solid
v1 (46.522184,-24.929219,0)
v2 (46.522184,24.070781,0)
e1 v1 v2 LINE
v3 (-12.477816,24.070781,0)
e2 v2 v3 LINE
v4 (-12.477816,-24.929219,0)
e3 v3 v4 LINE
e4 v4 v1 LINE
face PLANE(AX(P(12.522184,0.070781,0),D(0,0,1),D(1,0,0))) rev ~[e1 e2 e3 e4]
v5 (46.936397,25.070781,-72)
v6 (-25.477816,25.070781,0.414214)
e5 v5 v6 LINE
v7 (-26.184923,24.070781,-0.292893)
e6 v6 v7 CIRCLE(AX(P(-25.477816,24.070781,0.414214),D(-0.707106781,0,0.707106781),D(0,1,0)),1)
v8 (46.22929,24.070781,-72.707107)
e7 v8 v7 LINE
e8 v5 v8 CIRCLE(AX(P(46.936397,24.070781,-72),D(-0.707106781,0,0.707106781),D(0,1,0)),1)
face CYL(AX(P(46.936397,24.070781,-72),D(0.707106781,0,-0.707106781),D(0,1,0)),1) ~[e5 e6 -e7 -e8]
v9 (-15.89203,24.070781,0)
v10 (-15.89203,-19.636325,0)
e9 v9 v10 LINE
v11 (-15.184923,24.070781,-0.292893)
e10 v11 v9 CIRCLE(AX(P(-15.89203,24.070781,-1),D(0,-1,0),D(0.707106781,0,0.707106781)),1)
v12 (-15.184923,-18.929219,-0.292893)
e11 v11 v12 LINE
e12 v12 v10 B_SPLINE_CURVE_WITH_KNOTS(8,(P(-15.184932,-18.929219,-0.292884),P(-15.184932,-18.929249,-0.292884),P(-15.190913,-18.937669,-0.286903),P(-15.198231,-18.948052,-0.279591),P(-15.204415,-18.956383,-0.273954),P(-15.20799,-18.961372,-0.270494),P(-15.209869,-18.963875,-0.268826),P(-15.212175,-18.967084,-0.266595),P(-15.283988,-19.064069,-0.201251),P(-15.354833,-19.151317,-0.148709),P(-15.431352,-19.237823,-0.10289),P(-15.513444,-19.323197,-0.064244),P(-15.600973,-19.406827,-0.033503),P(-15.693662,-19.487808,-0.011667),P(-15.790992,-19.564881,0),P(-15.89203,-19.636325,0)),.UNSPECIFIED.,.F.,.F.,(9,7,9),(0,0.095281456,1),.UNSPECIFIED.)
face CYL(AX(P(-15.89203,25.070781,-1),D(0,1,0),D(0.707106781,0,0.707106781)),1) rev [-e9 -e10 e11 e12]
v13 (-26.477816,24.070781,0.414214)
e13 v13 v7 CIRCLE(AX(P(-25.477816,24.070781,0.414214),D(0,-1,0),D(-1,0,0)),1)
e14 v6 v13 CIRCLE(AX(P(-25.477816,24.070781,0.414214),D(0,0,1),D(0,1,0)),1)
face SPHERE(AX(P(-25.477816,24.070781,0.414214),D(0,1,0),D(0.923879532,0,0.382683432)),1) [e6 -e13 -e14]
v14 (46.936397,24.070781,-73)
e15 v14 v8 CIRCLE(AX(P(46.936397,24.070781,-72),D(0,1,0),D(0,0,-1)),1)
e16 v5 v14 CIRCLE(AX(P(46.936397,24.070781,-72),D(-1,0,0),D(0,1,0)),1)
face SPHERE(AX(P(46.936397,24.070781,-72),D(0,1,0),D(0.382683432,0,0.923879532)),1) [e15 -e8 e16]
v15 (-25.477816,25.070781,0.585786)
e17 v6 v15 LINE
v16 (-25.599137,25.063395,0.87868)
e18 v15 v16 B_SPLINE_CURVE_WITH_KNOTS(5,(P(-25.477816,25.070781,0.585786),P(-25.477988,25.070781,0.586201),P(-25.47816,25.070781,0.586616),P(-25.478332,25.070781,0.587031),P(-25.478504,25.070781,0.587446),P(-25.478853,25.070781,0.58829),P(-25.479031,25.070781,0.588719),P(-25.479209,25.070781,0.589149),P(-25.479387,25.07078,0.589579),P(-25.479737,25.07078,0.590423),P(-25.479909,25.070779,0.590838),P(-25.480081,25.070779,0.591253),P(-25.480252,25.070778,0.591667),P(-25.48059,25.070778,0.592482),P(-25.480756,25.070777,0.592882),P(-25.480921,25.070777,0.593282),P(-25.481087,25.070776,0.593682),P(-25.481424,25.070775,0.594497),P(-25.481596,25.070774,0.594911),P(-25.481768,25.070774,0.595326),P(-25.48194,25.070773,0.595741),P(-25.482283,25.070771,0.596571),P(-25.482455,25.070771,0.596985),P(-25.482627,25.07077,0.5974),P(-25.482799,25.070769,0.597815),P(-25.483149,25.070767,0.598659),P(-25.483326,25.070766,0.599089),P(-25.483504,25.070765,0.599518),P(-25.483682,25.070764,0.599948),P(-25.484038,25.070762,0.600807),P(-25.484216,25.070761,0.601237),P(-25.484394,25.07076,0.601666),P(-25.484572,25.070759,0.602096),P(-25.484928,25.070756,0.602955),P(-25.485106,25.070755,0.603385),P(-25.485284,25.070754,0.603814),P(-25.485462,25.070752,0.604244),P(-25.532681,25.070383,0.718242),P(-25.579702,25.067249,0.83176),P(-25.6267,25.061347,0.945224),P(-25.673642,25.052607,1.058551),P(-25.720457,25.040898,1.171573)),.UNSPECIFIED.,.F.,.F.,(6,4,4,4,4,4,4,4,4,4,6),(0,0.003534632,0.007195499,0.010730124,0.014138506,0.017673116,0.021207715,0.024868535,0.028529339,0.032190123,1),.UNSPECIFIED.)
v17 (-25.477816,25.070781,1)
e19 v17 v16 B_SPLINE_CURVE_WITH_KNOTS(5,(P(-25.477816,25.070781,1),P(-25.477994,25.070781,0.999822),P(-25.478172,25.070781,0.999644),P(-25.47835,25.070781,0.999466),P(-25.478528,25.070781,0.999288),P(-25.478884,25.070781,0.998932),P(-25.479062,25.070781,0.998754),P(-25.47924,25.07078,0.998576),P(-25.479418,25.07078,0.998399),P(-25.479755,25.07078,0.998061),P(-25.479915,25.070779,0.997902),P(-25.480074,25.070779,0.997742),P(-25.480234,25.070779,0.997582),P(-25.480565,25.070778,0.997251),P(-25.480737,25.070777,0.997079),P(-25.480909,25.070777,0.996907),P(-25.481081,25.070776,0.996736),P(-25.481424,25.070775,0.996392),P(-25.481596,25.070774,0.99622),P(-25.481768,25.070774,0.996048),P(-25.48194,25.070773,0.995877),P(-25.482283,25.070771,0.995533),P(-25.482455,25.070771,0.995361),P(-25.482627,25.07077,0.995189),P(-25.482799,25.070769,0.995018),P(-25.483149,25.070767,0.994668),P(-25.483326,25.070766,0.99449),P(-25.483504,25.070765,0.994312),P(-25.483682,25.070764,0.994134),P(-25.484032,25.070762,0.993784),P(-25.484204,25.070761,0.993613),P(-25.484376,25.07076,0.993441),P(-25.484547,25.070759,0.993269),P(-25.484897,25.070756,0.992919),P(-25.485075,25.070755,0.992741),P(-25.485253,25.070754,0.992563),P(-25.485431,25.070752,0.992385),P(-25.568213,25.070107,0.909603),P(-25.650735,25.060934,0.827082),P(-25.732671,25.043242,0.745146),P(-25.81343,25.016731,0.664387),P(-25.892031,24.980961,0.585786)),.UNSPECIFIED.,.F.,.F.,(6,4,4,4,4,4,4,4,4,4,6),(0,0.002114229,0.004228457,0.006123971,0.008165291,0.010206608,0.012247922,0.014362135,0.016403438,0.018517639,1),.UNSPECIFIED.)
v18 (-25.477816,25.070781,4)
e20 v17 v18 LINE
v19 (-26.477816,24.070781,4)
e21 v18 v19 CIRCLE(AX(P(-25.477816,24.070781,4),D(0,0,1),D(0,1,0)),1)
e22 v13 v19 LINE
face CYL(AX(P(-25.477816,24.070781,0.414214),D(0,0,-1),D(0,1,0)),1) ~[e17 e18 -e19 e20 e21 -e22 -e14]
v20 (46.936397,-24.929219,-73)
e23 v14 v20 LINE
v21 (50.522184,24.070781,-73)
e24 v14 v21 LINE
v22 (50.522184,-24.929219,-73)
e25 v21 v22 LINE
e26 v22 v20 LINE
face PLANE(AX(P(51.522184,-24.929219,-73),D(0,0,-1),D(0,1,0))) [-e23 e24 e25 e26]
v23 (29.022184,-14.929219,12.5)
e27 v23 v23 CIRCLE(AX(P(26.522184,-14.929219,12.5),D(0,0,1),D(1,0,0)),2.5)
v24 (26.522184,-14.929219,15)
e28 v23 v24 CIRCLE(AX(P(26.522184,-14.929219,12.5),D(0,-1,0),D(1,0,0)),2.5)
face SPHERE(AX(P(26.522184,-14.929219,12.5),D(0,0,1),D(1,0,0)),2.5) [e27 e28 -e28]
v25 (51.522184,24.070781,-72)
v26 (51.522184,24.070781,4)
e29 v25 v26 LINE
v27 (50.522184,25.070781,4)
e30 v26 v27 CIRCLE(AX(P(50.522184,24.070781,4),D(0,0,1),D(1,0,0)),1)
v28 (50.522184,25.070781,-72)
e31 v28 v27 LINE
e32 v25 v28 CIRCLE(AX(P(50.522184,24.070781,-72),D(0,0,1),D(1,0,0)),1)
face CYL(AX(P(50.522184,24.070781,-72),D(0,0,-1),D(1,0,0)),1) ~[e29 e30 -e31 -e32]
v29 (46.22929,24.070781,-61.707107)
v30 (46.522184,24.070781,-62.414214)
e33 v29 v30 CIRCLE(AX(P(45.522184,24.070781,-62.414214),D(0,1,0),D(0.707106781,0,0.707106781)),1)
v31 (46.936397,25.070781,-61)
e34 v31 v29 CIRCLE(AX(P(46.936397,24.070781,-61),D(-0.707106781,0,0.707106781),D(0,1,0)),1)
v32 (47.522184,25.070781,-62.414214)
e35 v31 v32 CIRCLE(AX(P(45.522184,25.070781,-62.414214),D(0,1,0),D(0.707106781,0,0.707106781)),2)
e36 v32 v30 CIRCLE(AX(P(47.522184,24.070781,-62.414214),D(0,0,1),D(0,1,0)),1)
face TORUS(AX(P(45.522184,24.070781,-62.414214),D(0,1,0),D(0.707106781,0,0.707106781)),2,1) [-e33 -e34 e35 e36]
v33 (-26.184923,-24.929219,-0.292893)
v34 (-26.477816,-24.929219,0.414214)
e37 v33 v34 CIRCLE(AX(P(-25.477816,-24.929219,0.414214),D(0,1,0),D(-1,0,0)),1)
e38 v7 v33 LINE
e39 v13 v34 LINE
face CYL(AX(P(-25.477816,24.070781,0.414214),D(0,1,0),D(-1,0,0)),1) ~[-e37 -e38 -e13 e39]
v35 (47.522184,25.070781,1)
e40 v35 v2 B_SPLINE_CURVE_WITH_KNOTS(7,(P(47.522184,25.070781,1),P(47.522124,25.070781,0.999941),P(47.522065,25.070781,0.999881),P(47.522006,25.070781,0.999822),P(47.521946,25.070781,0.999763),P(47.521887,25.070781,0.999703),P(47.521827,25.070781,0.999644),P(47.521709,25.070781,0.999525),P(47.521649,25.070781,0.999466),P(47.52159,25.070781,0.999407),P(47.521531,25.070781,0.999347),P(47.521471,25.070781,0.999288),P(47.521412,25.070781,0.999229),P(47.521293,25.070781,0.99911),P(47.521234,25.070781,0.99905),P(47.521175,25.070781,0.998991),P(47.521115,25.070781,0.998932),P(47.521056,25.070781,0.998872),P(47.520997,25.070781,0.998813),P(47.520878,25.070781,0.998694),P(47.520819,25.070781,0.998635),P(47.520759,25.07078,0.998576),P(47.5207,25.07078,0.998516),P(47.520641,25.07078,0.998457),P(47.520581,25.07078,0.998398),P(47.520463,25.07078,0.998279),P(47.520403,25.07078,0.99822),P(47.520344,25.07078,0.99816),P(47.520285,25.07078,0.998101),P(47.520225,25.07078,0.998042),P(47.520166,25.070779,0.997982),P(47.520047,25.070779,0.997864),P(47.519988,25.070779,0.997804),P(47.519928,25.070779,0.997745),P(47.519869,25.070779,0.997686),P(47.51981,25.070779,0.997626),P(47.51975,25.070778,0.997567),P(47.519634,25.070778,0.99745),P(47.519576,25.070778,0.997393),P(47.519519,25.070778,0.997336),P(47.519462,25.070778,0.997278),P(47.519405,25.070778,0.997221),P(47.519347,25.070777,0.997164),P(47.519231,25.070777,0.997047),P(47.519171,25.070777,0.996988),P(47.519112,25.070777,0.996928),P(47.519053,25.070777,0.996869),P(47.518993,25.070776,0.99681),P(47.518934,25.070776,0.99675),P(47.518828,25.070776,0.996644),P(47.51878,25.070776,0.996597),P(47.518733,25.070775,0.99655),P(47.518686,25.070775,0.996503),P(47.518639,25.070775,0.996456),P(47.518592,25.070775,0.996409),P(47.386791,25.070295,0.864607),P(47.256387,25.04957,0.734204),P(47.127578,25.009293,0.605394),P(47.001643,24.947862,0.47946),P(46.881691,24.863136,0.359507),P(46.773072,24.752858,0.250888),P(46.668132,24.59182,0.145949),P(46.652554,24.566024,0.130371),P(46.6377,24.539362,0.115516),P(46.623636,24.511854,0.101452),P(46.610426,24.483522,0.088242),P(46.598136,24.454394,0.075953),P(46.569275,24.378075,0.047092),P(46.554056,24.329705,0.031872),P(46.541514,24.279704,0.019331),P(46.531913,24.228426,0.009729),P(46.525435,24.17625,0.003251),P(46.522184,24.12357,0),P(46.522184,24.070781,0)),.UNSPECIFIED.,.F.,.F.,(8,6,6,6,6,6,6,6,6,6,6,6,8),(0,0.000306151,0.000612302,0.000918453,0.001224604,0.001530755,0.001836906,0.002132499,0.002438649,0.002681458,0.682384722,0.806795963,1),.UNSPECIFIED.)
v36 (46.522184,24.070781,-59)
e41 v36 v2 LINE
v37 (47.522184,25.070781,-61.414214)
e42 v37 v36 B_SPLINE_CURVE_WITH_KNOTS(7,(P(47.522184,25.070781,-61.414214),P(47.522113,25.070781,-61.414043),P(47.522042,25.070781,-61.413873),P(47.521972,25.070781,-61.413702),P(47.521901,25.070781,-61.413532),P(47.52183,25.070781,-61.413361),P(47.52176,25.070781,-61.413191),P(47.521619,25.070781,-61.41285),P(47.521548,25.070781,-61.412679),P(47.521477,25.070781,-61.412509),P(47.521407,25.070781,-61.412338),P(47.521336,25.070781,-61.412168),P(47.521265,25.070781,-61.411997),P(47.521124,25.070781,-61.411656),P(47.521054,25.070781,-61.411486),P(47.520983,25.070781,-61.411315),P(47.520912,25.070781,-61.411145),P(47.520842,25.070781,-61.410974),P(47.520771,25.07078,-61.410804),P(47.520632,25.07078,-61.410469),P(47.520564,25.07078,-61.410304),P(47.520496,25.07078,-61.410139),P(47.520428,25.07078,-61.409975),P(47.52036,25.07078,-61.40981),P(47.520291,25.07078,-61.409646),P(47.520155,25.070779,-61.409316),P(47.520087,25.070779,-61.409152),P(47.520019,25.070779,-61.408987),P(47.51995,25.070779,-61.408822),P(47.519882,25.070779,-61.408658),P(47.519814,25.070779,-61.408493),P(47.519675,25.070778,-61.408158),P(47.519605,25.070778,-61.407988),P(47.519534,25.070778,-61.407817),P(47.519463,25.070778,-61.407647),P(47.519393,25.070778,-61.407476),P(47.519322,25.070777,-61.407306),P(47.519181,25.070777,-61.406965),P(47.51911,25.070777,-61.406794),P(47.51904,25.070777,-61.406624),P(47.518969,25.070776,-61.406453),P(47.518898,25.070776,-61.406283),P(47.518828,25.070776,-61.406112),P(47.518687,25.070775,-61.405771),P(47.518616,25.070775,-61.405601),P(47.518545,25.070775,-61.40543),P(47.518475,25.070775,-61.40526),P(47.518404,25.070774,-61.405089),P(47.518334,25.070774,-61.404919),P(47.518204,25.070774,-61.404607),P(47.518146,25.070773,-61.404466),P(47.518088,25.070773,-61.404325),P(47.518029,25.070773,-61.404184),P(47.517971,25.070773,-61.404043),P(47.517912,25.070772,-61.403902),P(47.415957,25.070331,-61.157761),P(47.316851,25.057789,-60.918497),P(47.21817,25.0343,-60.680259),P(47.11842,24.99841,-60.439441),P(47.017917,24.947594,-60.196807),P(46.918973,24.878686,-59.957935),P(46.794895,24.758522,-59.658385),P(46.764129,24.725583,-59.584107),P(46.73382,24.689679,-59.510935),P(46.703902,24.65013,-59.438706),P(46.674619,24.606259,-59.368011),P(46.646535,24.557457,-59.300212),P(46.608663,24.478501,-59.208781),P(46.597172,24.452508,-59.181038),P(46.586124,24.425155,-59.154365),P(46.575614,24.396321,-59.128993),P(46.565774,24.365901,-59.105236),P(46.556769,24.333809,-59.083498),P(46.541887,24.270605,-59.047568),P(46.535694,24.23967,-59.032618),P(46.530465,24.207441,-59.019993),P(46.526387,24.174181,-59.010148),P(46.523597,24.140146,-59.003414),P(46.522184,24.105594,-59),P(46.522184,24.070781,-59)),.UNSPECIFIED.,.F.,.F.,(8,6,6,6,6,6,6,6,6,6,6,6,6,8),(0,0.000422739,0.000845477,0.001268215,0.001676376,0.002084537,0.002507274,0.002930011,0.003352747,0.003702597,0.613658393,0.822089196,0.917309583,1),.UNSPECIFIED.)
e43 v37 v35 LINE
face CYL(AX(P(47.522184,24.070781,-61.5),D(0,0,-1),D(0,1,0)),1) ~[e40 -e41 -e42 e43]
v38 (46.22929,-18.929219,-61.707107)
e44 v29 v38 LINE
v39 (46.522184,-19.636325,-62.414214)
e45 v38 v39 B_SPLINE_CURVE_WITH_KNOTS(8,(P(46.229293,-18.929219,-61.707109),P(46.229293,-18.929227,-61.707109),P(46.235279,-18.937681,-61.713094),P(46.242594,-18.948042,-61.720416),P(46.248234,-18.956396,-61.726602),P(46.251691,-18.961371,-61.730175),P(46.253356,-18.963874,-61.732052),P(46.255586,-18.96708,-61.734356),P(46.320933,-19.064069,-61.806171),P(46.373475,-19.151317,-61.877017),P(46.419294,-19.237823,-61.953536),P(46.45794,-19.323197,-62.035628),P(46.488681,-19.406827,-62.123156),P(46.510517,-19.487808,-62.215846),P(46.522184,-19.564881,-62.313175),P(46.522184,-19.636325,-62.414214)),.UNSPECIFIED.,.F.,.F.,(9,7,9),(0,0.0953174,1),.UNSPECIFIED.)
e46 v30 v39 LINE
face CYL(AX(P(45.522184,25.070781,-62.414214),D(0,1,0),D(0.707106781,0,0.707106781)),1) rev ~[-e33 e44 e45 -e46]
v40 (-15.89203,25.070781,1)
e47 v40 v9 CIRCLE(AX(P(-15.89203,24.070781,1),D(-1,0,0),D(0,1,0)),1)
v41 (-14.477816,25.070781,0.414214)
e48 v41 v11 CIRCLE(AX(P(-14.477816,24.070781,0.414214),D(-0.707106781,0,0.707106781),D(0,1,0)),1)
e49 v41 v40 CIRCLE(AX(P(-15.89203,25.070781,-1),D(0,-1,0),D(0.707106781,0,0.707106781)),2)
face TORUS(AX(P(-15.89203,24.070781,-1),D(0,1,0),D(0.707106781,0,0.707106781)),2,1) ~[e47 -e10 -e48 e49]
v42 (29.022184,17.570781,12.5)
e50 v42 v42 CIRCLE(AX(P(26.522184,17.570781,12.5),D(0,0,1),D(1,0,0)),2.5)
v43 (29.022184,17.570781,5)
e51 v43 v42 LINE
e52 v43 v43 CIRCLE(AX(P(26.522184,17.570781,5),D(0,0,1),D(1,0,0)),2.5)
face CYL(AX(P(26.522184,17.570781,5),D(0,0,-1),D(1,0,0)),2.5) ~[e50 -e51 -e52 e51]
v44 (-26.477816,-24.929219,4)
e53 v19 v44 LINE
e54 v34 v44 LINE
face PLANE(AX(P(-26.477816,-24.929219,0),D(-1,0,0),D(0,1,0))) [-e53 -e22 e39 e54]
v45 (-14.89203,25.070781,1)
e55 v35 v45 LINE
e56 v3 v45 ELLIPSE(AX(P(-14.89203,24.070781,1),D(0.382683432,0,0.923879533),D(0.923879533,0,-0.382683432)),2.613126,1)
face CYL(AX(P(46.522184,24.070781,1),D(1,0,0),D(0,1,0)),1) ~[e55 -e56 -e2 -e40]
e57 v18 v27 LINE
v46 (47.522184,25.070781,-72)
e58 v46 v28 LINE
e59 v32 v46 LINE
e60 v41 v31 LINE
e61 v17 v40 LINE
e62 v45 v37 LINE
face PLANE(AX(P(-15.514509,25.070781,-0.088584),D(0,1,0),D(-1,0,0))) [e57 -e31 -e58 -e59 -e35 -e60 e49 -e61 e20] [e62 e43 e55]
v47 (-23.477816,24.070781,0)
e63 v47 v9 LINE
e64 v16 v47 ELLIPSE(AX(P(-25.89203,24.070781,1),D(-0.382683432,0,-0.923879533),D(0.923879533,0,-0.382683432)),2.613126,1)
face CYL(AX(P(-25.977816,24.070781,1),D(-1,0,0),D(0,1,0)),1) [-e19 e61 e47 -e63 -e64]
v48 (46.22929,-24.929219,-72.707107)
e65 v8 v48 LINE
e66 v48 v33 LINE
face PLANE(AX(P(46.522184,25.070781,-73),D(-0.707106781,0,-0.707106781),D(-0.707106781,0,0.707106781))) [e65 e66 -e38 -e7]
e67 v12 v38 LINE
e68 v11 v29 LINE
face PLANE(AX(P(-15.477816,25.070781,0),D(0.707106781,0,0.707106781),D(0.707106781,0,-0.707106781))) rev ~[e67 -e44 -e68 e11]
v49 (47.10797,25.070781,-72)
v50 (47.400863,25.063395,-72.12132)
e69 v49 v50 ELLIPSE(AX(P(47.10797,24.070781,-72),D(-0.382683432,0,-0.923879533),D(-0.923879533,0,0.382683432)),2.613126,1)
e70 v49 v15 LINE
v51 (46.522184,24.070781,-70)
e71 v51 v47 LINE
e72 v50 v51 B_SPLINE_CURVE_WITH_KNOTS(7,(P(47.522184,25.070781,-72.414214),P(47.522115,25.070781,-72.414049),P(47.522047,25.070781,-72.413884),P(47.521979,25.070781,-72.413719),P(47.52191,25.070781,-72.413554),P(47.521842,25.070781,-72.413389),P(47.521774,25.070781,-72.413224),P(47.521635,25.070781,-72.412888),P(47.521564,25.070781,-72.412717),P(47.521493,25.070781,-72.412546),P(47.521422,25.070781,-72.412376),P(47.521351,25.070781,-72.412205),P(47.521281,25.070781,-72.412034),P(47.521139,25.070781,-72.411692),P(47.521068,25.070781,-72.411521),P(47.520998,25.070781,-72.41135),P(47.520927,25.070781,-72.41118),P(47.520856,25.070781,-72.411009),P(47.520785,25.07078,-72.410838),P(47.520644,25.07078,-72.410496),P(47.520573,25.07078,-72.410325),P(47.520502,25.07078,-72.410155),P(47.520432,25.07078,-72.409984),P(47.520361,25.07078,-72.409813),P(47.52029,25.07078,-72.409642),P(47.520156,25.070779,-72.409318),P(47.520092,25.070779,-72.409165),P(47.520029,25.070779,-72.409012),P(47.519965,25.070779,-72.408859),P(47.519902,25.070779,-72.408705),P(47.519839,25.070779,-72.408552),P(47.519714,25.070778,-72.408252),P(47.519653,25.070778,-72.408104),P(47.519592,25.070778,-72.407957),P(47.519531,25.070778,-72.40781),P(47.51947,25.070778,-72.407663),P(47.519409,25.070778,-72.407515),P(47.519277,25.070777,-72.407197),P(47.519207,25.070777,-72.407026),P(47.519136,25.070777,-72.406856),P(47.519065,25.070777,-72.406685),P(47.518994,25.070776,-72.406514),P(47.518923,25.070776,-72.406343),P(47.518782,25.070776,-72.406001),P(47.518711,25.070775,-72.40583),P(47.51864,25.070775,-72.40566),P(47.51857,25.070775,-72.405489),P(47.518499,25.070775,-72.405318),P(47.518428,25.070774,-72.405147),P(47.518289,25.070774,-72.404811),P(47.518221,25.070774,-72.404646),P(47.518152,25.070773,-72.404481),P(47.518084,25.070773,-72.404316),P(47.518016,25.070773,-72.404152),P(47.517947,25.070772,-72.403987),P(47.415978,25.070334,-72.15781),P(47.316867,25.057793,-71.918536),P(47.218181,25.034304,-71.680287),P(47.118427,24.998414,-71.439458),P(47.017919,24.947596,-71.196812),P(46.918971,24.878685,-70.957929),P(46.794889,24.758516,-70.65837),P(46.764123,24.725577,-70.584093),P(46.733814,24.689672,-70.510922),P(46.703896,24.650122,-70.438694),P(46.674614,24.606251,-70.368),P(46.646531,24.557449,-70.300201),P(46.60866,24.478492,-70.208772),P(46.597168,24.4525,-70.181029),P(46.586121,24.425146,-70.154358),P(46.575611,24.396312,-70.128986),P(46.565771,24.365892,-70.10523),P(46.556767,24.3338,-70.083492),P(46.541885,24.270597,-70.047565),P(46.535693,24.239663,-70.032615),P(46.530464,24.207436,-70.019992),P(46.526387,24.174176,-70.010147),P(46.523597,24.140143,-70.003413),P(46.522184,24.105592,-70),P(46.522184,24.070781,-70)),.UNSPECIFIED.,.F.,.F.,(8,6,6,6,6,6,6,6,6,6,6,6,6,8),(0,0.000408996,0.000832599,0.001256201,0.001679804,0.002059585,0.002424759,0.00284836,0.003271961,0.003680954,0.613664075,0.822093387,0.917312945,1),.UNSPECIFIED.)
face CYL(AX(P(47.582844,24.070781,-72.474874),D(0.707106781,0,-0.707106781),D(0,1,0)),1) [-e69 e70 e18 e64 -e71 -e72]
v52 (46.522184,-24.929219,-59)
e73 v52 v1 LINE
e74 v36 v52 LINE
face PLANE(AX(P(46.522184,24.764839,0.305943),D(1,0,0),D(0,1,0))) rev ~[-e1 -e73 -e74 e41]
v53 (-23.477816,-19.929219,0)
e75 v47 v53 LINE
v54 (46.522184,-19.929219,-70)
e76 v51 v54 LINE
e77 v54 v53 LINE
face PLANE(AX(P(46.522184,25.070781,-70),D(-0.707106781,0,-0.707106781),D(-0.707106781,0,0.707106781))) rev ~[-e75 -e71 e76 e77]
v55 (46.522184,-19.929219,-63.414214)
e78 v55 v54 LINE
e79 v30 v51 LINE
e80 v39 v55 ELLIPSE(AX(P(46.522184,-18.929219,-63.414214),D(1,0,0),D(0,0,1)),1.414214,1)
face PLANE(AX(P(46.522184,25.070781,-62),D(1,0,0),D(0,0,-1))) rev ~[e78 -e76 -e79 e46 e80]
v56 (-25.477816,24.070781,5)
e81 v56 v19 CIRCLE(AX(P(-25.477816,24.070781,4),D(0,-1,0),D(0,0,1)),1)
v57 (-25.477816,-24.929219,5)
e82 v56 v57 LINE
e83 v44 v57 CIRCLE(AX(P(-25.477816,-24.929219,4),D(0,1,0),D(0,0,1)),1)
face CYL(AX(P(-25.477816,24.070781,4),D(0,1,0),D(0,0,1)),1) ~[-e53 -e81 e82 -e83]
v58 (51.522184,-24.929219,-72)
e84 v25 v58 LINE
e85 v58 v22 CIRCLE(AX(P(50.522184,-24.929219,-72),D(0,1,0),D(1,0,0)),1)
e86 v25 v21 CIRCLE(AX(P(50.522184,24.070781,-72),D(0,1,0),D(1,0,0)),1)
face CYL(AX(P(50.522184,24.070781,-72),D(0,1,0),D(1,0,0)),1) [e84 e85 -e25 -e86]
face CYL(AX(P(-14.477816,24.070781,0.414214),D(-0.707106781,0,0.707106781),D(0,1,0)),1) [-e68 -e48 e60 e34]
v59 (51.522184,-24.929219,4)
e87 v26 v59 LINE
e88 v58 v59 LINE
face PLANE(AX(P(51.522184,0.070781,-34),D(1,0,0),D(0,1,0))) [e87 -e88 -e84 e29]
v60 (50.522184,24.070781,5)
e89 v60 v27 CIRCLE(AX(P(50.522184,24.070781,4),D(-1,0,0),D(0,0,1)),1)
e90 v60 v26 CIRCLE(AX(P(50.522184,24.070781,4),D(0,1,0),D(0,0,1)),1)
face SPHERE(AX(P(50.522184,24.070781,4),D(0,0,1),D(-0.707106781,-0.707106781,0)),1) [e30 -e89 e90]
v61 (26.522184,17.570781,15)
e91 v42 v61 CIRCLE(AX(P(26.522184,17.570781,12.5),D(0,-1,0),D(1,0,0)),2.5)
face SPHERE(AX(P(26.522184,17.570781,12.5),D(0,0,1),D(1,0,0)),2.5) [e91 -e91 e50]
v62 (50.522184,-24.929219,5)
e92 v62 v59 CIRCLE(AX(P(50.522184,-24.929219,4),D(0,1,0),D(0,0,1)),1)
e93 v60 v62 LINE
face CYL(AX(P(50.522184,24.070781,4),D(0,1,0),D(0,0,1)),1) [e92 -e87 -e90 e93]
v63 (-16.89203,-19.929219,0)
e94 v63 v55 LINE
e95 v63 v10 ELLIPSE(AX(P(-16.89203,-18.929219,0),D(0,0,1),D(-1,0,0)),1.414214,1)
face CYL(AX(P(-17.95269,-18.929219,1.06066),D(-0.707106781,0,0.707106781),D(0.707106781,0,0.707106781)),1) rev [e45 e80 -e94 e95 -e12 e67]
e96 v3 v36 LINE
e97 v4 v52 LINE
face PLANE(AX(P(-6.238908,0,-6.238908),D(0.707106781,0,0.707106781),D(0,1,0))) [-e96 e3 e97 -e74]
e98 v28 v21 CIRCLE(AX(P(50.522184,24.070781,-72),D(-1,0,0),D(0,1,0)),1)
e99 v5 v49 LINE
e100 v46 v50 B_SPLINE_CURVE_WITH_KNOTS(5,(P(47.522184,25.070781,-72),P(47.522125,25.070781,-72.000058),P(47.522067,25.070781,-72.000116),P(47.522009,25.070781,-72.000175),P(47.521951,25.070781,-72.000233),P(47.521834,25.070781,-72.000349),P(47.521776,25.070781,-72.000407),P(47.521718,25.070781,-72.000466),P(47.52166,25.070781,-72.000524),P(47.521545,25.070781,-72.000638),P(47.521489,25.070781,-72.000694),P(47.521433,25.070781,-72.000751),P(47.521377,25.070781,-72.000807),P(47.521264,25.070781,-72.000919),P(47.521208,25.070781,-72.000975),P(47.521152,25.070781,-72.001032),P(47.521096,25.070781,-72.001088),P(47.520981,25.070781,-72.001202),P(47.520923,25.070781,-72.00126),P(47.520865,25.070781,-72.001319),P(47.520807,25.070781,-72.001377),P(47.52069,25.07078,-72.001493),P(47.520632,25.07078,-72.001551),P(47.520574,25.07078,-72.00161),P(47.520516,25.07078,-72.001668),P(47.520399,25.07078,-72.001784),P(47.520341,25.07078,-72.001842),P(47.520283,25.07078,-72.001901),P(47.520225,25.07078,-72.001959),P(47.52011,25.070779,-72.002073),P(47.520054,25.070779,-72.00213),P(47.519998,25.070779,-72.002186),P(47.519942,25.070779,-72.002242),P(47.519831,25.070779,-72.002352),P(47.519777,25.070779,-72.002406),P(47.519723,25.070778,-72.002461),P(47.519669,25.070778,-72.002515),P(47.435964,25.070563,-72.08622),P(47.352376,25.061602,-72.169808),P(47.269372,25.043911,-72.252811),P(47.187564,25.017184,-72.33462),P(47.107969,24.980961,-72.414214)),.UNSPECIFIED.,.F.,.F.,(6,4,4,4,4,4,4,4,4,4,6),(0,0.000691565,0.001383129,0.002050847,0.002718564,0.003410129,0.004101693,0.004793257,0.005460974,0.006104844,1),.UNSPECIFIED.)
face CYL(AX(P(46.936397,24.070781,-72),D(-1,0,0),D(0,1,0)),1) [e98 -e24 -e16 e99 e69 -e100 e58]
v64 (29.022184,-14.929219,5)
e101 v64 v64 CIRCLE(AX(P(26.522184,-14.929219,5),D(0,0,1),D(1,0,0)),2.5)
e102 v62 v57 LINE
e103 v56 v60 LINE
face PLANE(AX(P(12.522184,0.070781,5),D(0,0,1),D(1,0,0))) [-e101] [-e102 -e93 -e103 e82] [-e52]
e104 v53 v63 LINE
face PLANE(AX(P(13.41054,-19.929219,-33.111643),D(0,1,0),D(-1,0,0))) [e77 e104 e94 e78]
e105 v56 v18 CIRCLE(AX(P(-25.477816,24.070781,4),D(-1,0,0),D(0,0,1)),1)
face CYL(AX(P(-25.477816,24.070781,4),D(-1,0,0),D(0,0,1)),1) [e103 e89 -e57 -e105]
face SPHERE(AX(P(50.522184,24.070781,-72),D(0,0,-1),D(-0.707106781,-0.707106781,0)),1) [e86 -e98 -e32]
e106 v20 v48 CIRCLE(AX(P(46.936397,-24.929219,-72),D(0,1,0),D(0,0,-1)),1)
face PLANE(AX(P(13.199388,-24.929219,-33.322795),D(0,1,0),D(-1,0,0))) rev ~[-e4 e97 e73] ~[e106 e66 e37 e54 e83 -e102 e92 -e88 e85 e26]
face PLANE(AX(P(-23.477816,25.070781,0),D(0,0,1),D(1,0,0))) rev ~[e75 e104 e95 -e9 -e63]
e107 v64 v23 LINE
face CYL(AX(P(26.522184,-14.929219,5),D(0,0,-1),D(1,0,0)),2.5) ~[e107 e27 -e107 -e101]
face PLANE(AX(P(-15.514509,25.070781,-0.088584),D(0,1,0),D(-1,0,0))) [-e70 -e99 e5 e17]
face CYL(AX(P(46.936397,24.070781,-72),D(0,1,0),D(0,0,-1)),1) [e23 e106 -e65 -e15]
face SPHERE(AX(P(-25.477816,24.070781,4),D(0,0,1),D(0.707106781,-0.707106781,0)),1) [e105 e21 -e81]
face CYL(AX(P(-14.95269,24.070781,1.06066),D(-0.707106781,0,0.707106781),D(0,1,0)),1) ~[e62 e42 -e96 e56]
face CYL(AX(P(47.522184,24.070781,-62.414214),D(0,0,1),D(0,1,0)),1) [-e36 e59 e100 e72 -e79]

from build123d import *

# Parameters (mm, degrees)
F0_W           = 78
F0_H           = 50
F1_DEPTH       = 5
F2_R           = 2.5
F3_DEPTH       = 10
F4_R           = 2.5
F5_W           = 50
F5_H           = 78
F6_DEPTH       = 5
F8_DEPTH       = 50
F10_DEPTH      = 45
F11_T1_DEPTH   = 46.0355339059
F11_T3_DEPTH   = 92.6812408671
F11_T5_DEPTH   = 86.8528137424
F11_T7_DEPTH   = 76
F11_T9_DEPTH   = 76
F11_T11_DEPTH  = 3.5857864376
F11_T13_DEPTH  = 102.4091629285
F11_T15_DEPTH  = 3.5857864376
F11_T17_DEPTH  = 51.5
F11_T19_DEPTH  = 50.0355339059
F11_S23_W      = 1.02
F11_S23_H      = 1.02
F11_T24_DEPTH  = 1.02
F11_S29_W      = 1.02
F11_S29_H      = 1.02
F11_T30_DEPTH  = 1.02
F11_S35_W      = 1.02
F11_S35_H      = 1.02
F11_T36_DEPTH  = 1.02
F11_T42_DEPTH  = 1.02
F11_T48_DEPTH  = 1.02
F11_T54_DEPTH  = 61.5
F11_T59_DEPTH  = 61.5
F11_T64_DEPTH  = 88.43860018
F11_T70_DEPTH  = 103.9949493661
F11_T76_DEPTH  = 10.0857864376
F11_T81_DEPTH  = 10.0857864376
F11_T84_ANGLE  = 45
F11_T86_ANGLE  = 45
F11_T91_DEPTH  = 64
F11_T95_DEPTH  = 64
F11_T102_DEPTH = 61.5
F11_T106_DEPTH = 88.43860018
F11_T113_DEPTH = 61.5
F11_T117_DEPTH = 88.43860018
F11_T124_DEPTH = 10.0857864376
F11_T128_DEPTH = 103.9949493661
F11_T135_DEPTH = 103.9949493661
F11_T139_DEPTH = 10.0857864376


# Not quite as in the source:
# - a fillet or chamfer that OpenCascade refuses, or shapes differently, is made with other operations: its cross-section is extruded or revolved along the edge and cut away or added


with BuildPart() as f1:
    # F0 (on Top) → F1 (new body)
    with BuildSketch(Plane.XY):
        with Locations((12.5221835672, 0.070781447)):
            Rectangle(F0_W, F0_H)
    extrude(amount=F1_DEPTH)

    # F2 (on face) → F3 (join)
    with BuildSketch(Plane.XY.offset(5)):
        with Locations((26.5221835672, 17.570781447)):
            Circle(F2_R)
        with Locations((26.5221835672, -14.929218553)):
            Circle(F2_R)
    extrude(amount=F3_DEPTH)

    # F4
    f4_edges = [f1.edges().sort_by_distance(p)[0] for p in [
        (24.022184, 17.570781, 15),
        (24.022184, -14.929219, 15),
    ]]
    fillet(f4_edges, radius=F4_R)

    # F5 (on face) → F6 (join)
    with BuildSketch(Plane.YZ.offset(51.5221835672)):
        with Locations((0.070781447, -34)):
            Rectangle(F5_W, F5_H)
    extrude(amount=-F6_DEPTH)

    # F7 (on face) → F8 (join)
    with BuildSketch(Plane(origin=(0, 25.070781447, 0), x_dir=(-1, 0, 0), z_dir=(0, 1, 0))):
        Polygon((-46.5221835672, -73), (26.4778164328, 0), (12.4778164328, 0), (-46.5221835672, -59), align=None)
    extrude(amount=-F8_DEPTH)

    # F9 (on face) → F10 (cut)
    with BuildSketch(Plane(origin=(0, 25.070781447, 0), x_dir=(-1, 0, 0), z_dir=(0, 1, 0))):
        Polygon((15.4778164328, 0), (-46.5221835672, -62), (-46.5221835672, -70), (23.4778164328, 0), align=None)
    extrude(amount=-F10_DEPTH, mode=Mode.SUBTRACT)

    # F11: fillet of radius 1 on 20 edges, made by hand

    # F11_s2 → F11_t1 (join)
    with BuildSketch(Plane.XZ.offset(-25.070781447)):
        with BuildLine():
            ThreePointArc((-15.1849232139, -0.2928932188), (-15.5093465628, -0.0761204675), (-15.8920299951, 0))
            Line((-15.8920299951, 0), (-15.4778164328, 0))
            Line((-15.4778164328, 0), (-15.1849232139, -0.2928932188))
        make_face()
        with BuildLine():
            ThreePointArc((46.2292903484, -61.7071067812), (46.4460630998, -62.03153013), (46.5221835672, -62.4142135624))
            Line((46.5221835672, -62.4142135624), (46.5221835672, -62))
            Line((46.5221835672, -62), (46.2292903484, -61.7071067812))
        make_face()
    extrude(amount=F11_T1_DEPTH)

    # F11_s4 → F11_t3 (join)
    with BuildSketch(Plane(origin=(-9.5066751693, 0, 9.5066751693), x_dir=(0, 1, 0), z_dir=(0.7071067812, 0, -0.7071067812))):
        with BuildLine():
            ThreePointArc((-18.929218553, -10.9444689576), (-19.6363253342, -11.2373621764), (-19.929218553, -11.9444689576))
            Line((-19.929218553, -11.9444689576), (-19.929218553, -10.9444689576))
            Line((-19.929218553, -10.9444689576), (-18.929218553, -10.9444689576))
        make_face()
    extrude(amount=F11_T3_DEPTH)

    # F11_s6 → F11_t5 (cut)
    with BuildSketch(Plane(origin=(-7.4460149976, 0, 7.4460149976), x_dir=(0, 1, 0), z_dir=(0.7071067812, 0, -0.7071067812))):
        with BuildLine():
            ThreePointArc((25.070781447, -9.9444689576), (24.7778882282, -10.6515757388), (24.070781447, -10.9444689576))
            Line((24.070781447, -10.9444689576), (25.070781447, -10.9444689576))
            Line((25.070781447, -10.9444689576), (25.070781447, -9.9444689576))
        make_face()
    extrude(amount=F11_T5_DEPTH, mode=Mode.SUBTRACT)

    # F11_s8 → F11_t7 (cut)
    with BuildSketch(Plane.YZ.offset(-25.4778164328)):
        with BuildLine():
            ThreePointArc((24.070781447, 5), (24.7778882282, 4.7071067812), (25.070781447, 4))
            Line((25.070781447, 4), (25.070781447, 5))
            Line((25.070781447, 5), (24.070781447, 5))
        make_face()
    extrude(amount=F11_T7_DEPTH, mode=Mode.SUBTRACT)

    # F11_s10 → F11_t9 (cut)
    with BuildSketch(Plane.XY.offset(-72)):
        with BuildLine():
            ThreePointArc((51.5221835672, 24.070781447), (51.2292903484, 24.7778882282), (50.5221835672, 25.070781447))
            Line((50.5221835672, 25.070781447), (51.5221835672, 25.070781447))
            Line((51.5221835672, 25.070781447), (51.5221835672, 24.070781447))
        make_face()
    extrude(amount=F11_T9_DEPTH, mode=Mode.SUBTRACT)

    # F11_s12 → F11_t11 (cut)
    with BuildSketch(Plane.YZ.offset(46.9363971296)):
        with BuildLine():
            ThreePointArc((25.070781447, -72), (24.7778882282, -72.7071067812), (24.070781447, -73))
            Line((24.070781447, -73), (25.070781447, -73))
            Line((25.070781447, -73), (25.070781447, -72))
        make_face()
    extrude(amount=F11_T11_DEPTH, mode=Mode.SUBTRACT)

    # F11_s14 → F11_t13 (cut)
    with BuildSketch(Plane(origin=(59.4681985648, 0, -59.4681985648), x_dir=(0, 1, 0), z_dir=(-0.7071067812, 0, 0.7071067812))):
        with BuildLine():
            ThreePointArc((25.070781447, 17.7226435506), (24.7778882282, 18.4297503318), (24.070781447, 18.7226435506))
            Line((24.070781447, 18.7226435506), (25.070781447, 18.7226435506))
            Line((25.070781447, 18.7226435506), (25.070781447, 17.7226435506))
        make_face()
    extrude(amount=F11_T13_DEPTH, mode=Mode.SUBTRACT)

    # F11_s16 → F11_t15 (cut)
    with BuildSketch(Plane.XY.offset(0.4142135624)):
        with BuildLine():
            ThreePointArc((-25.4778164328, 25.070781447), (-26.1849232139, 24.7778882282), (-26.4778164328, 24.070781447))
            Line((-26.4778164328, 24.070781447), (-26.4778164328, 25.070781447))
            Line((-26.4778164328, 25.070781447), (-25.4778164328, 25.070781447))
        make_face()
    extrude(amount=F11_T15_DEPTH, mode=Mode.SUBTRACT)

    # F11_s18 → F11_t17 (cut)
    with BuildSketch(Plane.XZ.offset(-24.070781447)):
        with BuildLine():
            ThreePointArc((51.5221835672, -72), (51.2292903484, -72.7071067812), (50.5221835672, -73))
            Line((50.5221835672, -73), (51.5221835672, -73))
            Line((51.5221835672, -73), (51.5221835672, -72))
        make_face()
        with BuildLine():
            ThreePointArc((50.5221835672, 5), (51.2292903484, 4.7071067812), (51.5221835672, 4))
            Line((51.5221835672, 4), (51.5221835672, 5))
            Line((51.5221835672, 5), (50.5221835672, 5))
        make_face()
        with BuildLine():
            ThreePointArc((-25.4778164328, 5), (-26.1849232139, 4.7071067812), (-26.4778164328, 4))
            Line((-26.4778164328, 4), (-26.4778164328, 5))
            Line((-26.4778164328, 5), (-25.4778164328, 5))
        make_face()
    extrude(amount=F11_T17_DEPTH, mode=Mode.SUBTRACT)

    # F11_s20 → F11_t19 (cut)
    with BuildSketch(Plane.XZ.offset(-24.070781447)):
        with BuildLine():
            ThreePointArc((46.9363971296, -73), (46.5537136972, -72.9238795325), (46.2292903484, -72.7071067812))
            Line((46.2292903484, -72.7071067812), (46.5221835672, -73))
            Line((46.5221835672, -73), (46.9363971296, -73))
        make_face()
        with BuildLine():
            ThreePointArc((-26.4778164328, 0.4142135624), (-26.4016959653, 0.03153013), (-26.1849232139, -0.2928932188))
            Line((-26.1849232139, -0.2928932188), (-26.4778164328, 0))
            Line((-26.4778164328, 0), (-26.4778164328, 0.4142135624))
        make_face()
    extrude(amount=F11_T19_DEPTH, mode=Mode.SUBTRACT)


with BuildPart() as f11_tool22:
    # F11_s23 → F11_t24 (new body)
    with BuildSketch(Plane.XY.offset(4)):
        with Locations((51.0321835672, 24.580781447)):
            Rectangle(F11_S23_W, F11_S23_H)
    extrude(amount=F11_T24_DEPTH)

    # F11_s25 → F11_t26 (revolve, cut)
    with BuildSketch(Plane(origin=(50.5221835672, 24.070781447, 4), x_dir=(-0.7071067812, -0.7071067812, 0), z_dir=(-0.7071067812, 0.7071067812, 0))):
        with BuildLine():
            ThreePointArc((0, -1), (1, 0), (0, 1))
            Line((0, 1), (0, -1))
        make_face()
    revolve(axis=Axis((50.5221835672, 24.070781447, 4), (0, 0, 1)), mode=Mode.SUBTRACT)


with BuildPart() as f1_1:
    add(f1.part)

    # F11_t21: cut F11_tool22
    add(f11_tool22.part, mode=Mode.SUBTRACT)


with BuildPart() as f11_tool28:
    # F11_s29 → F11_t30 (new body)
    with BuildSketch(Plane.XY.offset(4)):
        with Locations((-25.9878164328, 24.580781447)):
            Rectangle(F11_S29_W, F11_S29_H)
    extrude(amount=F11_T30_DEPTH)

    # F11_s31 → F11_t32 (revolve, cut)
    with BuildSketch(Plane(origin=(-25.4778164328, 24.070781447, 4), x_dir=(0.7071067812, -0.7071067812, 0), z_dir=(-0.7071067812, -0.7071067812, 0))):
        with BuildLine():
            ThreePointArc((0, -1), (1, 0), (0, 1))
            Line((0, 1), (0, -1))
        make_face()
    revolve(axis=Axis((-25.4778164328, 24.070781447, 4), (0, 0, 1)), mode=Mode.SUBTRACT)


with BuildPart() as f1_2:
    add(f1_1.part)

    # F11_t27: cut F11_tool28
    add(f11_tool28.part, mode=Mode.SUBTRACT)


with BuildPart() as f11_tool34:
    # F11_s35 → F11_t36 (new body)
    with BuildSketch(Plane.XY.offset(-72)):
        with Locations((51.0321835672, 24.580781447)):
            Rectangle(F11_S35_W, F11_S35_H)
    extrude(amount=-F11_T36_DEPTH)

    # F11_s37 → F11_t38 (revolve, cut)
    with BuildSketch(Plane(origin=(50.5221835672, 24.070781447, -72), x_dir=(-0.7071067812, -0.7071067812, 0), z_dir=(0.7071067812, -0.7071067812, 0))):
        with BuildLine():
            ThreePointArc((0, -1), (1, 0), (0, 1))
            Line((0, 1), (0, -1))
        make_face()
    revolve(axis=Axis((50.5221835672, 24.070781447, -72), (0, 0, -1)), mode=Mode.SUBTRACT)


with BuildPart() as f1_3:
    add(f1_2.part)

    # F11_t33: cut F11_tool34
    add(f11_tool34.part, mode=Mode.SUBTRACT)


with BuildPart() as f11_tool40:
    # F11_s41 → F11_t42 (new body)
    with BuildSketch(Plane.XZ.offset(-24.070781447)):
        Polygon((46.9363971296, -72), (46.9363971296, -73.02), (46.513899296, -73.02), (46.2151482128, -72.7212489168), align=None)
    extrude(amount=-F11_T42_DEPTH)

    # F11_s43 → F11_t44 (revolve, cut)
    with BuildSketch(Plane(origin=(46.9363971296, 24.070781447, -72), x_dir=(0.3826834324, 0, 0.9238795325), z_dir=(-0.9238795325, 0, 0.3826834324))):
        with BuildLine():
            ThreePointArc((0, -1), (1, 0), (0, 1))
            Line((0, 1), (0, -1))
        make_face()
    revolve(axis=Axis((46.9363971296, 24.070781447, -72), (0, 1, 0)), mode=Mode.SUBTRACT)


with BuildPart() as f1_4:
    add(f1_3.part)

    # F11_t39: cut F11_tool40
    add(f11_tool40.part, mode=Mode.SUBTRACT)


with BuildPart() as f11_tool46:
    # F11_s47 → F11_t48 (new body)
    with BuildSketch(Plane.XZ.offset(-24.070781447)):
        Polygon((-25.4778164328, 0.4142135624), (-26.4978164328, 0.4142135624), (-26.4978164328, -0.0082842712), (-26.1990653496, -0.3070353544), align=None)
    extrude(amount=-F11_T48_DEPTH)

    # F11_s49 → F11_t50 (revolve, cut)
    with BuildSketch(Plane(origin=(-25.4778164328, 24.070781447, 0.4142135624), x_dir=(0.9238795325, 0, 0.3826834324), z_dir=(-0.3826834324, 0, 0.9238795325))):
        with BuildLine():
            ThreePointArc((0, -1), (1, 0), (0, 1))
            Line((0, 1), (0, -1))
        make_face()
    revolve(axis=Axis((-25.4778164328, 24.070781447, 0.4142135624), (0, 1, 0)), mode=Mode.SUBTRACT)


with BuildPart() as f1_5:
    add(f1_4.part)

    # F11_t45: cut F11_tool46
    add(f11_tool46.part, mode=Mode.SUBTRACT)


with BuildPart() as f11_tool52:
    # F11_s53 → F11_t54 (new body)
    with BuildSketch(Plane.YZ.offset(46.5221835672)):
        with BuildLine():
            ThreePointArc((25.070781447, 1), (24.7778882282, 0.2928932188), (24.070781447, 0))
            Line((24.070781447, 0), (25.070781447, 0))
            Line((25.070781447, 0), (25.070781447, 1))
        make_face()
    extrude(amount=-F11_T54_DEPTH)

    split(bisect_by=Plane(origin=(-6.2389082164, 0, -6.2389082164), x_dir=(0, 1, 0), z_dir=(0.7071067812, 0, 0.7071067812)), keep=Keep.TOP)


with BuildPart() as f1_6:
    add(f1_5.part)

    # F11_t51: cut F11_tool52
    add(f11_tool52.part, mode=Mode.SUBTRACT)


with BuildPart() as f11_tool57:
    # F11_s58 → F11_t59 (new body)
    with BuildSketch(Plane.XY.offset(-61.5)):
        with BuildLine():
            ThreePointArc((47.5221835672, 25.070781447), (46.8150767861, 24.7778882282), (46.5221835672, 24.070781447))
            Line((46.5221835672, 24.070781447), (46.5221835672, 25.070781447))
            Line((46.5221835672, 25.070781447), (47.5221835672, 25.070781447))
        make_face()
    extrude(amount=F11_T59_DEPTH)

    split(bisect_by=Plane(origin=(-6.2389082164, 0, -6.2389082164), x_dir=(0, 1, 0), z_dir=(0.7071067812, 0, 0.7071067812)), keep=Keep.TOP)


with BuildPart() as f1_7:
    add(f1_6.part)

    # F11_t56: cut F11_tool57
    add(f11_tool57.part, mode=Mode.SUBTRACT)


with BuildPart() as f11_tool62:
    # F11_s63 → F11_t64 (new body)
    with BuildSketch(Plane(origin=(-8.0066751693, 0, 8.0066751693), x_dir=(0, 1, 0), z_dir=(0.7071067812, 0, -0.7071067812))):
        with BuildLine():
            ThreePointArc((25.070781447, -9.823148614), (24.7778882282, -9.1160418328), (24.070781447, -8.823148614))
            Line((24.070781447, -8.823148614), (25.070781447, -8.823148614))
            Line((25.070781447, -8.823148614), (25.070781447, -9.823148614))
        make_face()
    extrude(amount=F11_T64_DEPTH)

    split(bisect_by=Plane.XY, keep=Keep.BOTTOM)

    split(bisect_by=Plane.YZ.offset(46.5221835672), keep=Keep.BOTTOM)


with BuildPart() as f1_8:
    add(f1_7.part)

    # F11_t61: cut F11_tool62
    add(f11_tool62.part, mode=Mode.SUBTRACT)


with BuildPart() as f11_tool68:
    # F11_s69 → F11_t70 (new body)
    with BuildSketch(Plane(origin=(60.0288587366, 0, -60.0288587366), x_dir=(0, 1, 0), z_dir=(-0.7071067812, 0, 0.7071067812))):
        with BuildLine():
            ThreePointArc((25.070781447, 17.6013232071), (24.7778882282, 16.8942164259), (24.070781447, 16.6013232071))
            Line((24.070781447, 16.6013232071), (25.070781447, 16.6013232071))
            Line((25.070781447, 16.6013232071), (25.070781447, 17.6013232071))
        make_face()
    extrude(amount=F11_T70_DEPTH)

    split(bisect_by=Plane.XY, keep=Keep.BOTTOM)

    split(bisect_by=Plane.YZ.offset(46.5221835672), keep=Keep.BOTTOM)


with BuildPart() as f1_9:
    add(f1_8.part)

    # F11_t67: cut F11_tool68
    add(f11_tool68.part, mode=Mode.SUBTRACT)


with BuildPart() as f11_tool74:
    # F11_s75 → F11_t76 (new body)
    with BuildSketch(Plane.YZ.offset(-25.9778164328)):
        with BuildLine():
            ThreePointArc((25.070781447, 1), (24.7778882282, 0.2928932188), (24.070781447, 0))
            Line((24.070781447, 0), (25.070781447, 0))
            Line((25.070781447, 0), (25.070781447, 1))
        make_face()
    extrude(amount=F11_T76_DEPTH)

    split(bisect_by=Plane(origin=(-11.7389082164, 0, -11.7389082164), x_dir=(0, 1, 0), z_dir=(0.7071067812, 0, 0.7071067812)), keep=Keep.TOP)


with BuildPart() as f1_10:
    add(f1_9.part)

    # F11_t73: cut F11_tool74
    add(f11_tool74.part, mode=Mode.SUBTRACT)


with BuildPart() as f11_tool79:
    # F11_s80 → F11_t81 (new body)
    with BuildSketch(Plane.XY.offset(-62.4142135624)):
        with BuildLine():
            ThreePointArc((47.5221835672, 25.070781447), (46.8150767861, 24.7778882282), (46.5221835672, 24.070781447))
            Line((46.5221835672, 24.070781447), (46.5221835672, 25.070781447))
            Line((46.5221835672, 25.070781447), (47.5221835672, 25.070781447))
        make_face()
    extrude(amount=-F11_T81_DEPTH)

    split(bisect_by=Plane(origin=(-11.7389082164, 0, -11.7389082164), x_dir=(0, 1, 0), z_dir=(0.7071067812, 0, 0.7071067812)), keep=Keep.TOP)


with BuildPart() as f1_11:
    add(f1_10.part)

    # F11_t78: cut F11_tool79
    add(f11_tool79.part, mode=Mode.SUBTRACT)

    # F11_s83 → F11_t84 (revolve, cut)
    with BuildSketch(Plane(origin=(53.9681985648, 0, -53.9681985648), x_dir=(0, 1, 0), z_dir=(-0.7071067812, 0, 0.7071067812))):
        with BuildLine():
            ThreePointArc((25.070781447, 9.9444689576), (24.7778882282, 10.6515757388), (24.070781447, 10.9444689576))
            Line((24.070781447, 10.9444689576), (25.070781447, 10.9444689576))
            Line((25.070781447, 10.9444689576), (25.070781447, 9.9444689576))
        make_face()
    revolve(axis=Axis((45.5221835672, 25.070781447, -62.4142135624), (0, 1, 0)), revolution_arc=F11_T84_ANGLE, mode=Mode.SUBTRACT)

    # F11_s85 → F11_t86 (revolve, cut)
    with BuildSketch(Plane(origin=(-7.4460149976, 0, 7.4460149976), x_dir=(0, 1, 0), z_dir=(0.7071067812, 0, -0.7071067812))):
        with BuildLine():
            ThreePointArc((25.070781447, -9.9444689576), (24.7778882282, -10.6515757388), (24.070781447, -10.9444689576))
            Line((24.070781447, -10.9444689576), (25.070781447, -10.9444689576))
            Line((25.070781447, -10.9444689576), (25.070781447, -9.9444689576))
        make_face()
    revolve(axis=Axis((-15.8920299951, 25.070781447, -1), (0, -1, 0)), revolution_arc=F11_T86_ANGLE, mode=Mode.SUBTRACT)


with BuildPart() as f11_tool89:
    # F11_s90 → F11_t91 (new body)
    with BuildSketch(Plane.YZ.offset(49.0221835672)):
        with BuildLine():
            ThreePointArc((25.070781447, 1), (24.7778882282, 0.2928932188), (24.070781447, 0))
            Line((24.070781447, 0), (25.070781447, 0))
            Line((25.070781447, 0), (25.070781447, 1))
        make_face()
    extrude(amount=-F11_T91_DEPTH)

    split(bisect_by=Plane.YZ.offset(46.5221835672), keep=Keep.TOP)


with BuildPart() as f11_tool93:
    # F11_s94 → F11_t95 (new body)
    with BuildSketch(Plane.XY.offset(-61.5)):
        with BuildLine():
            ThreePointArc((47.5221835672, 25.070781447), (46.8150767861, 24.7778882282), (46.5221835672, 24.070781447))
            Line((46.5221835672, 24.070781447), (46.5221835672, 25.070781447))
            Line((46.5221835672, 25.070781447), (47.5221835672, 25.070781447))
        make_face()
    extrude(amount=F11_T95_DEPTH)

    split(bisect_by=Plane.XY, keep=Keep.TOP)


with BuildPart() as f11_tool89_1:
    add(f11_tool89.part)

    # F11_t97: intersect F11_tool93
    add(f11_tool93.part, mode=Mode.INTERSECT)


with BuildPart() as f1_12:
    add(f1_11.part)

    # F11_t87: cut F11_tool89
    add(f11_tool89_1.part, mode=Mode.SUBTRACT)


with BuildPart() as f11_tool100:
    # F11_s101 → F11_t102 (new body)
    with BuildSketch(Plane.YZ.offset(46.5221835672)):
        with BuildLine():
            ThreePointArc((25.070781447, 1), (24.7778882282, 0.2928932188), (24.070781447, 0))
            Line((24.070781447, 0), (25.070781447, 0))
            Line((25.070781447, 0), (25.070781447, 1))
        make_face()
    extrude(amount=-F11_T102_DEPTH)

    split(bisect_by=Plane(origin=(-6.2389082164, 0, -6.2389082164), x_dir=(0, 1, 0), z_dir=(-0.7071067812, 0, -0.7071067812)), keep=Keep.TOP)


with BuildPart() as f11_tool104:
    # F11_s105 → F11_t106 (new body)
    with BuildSketch(Plane(origin=(-8.0066751693, 0, 8.0066751693), x_dir=(0, 1, 0), z_dir=(0.7071067812, 0, -0.7071067812))):
        with BuildLine():
            ThreePointArc((25.070781447, -9.823148614), (24.7778882282, -9.1160418328), (24.070781447, -8.823148614))
            Line((24.070781447, -8.823148614), (25.070781447, -8.823148614))
            Line((25.070781447, -8.823148614), (25.070781447, -9.823148614))
        make_face()
    extrude(amount=F11_T106_DEPTH)

    split(bisect_by=Plane.XY, keep=Keep.TOP)


with BuildPart() as f11_tool100_1:
    add(f11_tool100.part)

    # F11_t108: intersect F11_tool104
    add(f11_tool104.part, mode=Mode.INTERSECT)


with BuildPart() as f1_13:
    add(f1_12.part)

    # F11_t98: cut F11_tool100
    add(f11_tool100_1.part, mode=Mode.SUBTRACT)


with BuildPart() as f11_tool111:
    # F11_s112 → F11_t113 (new body)
    with BuildSketch(Plane.XY.offset(-61.5)):
        with BuildLine():
            ThreePointArc((47.5221835672, 25.070781447), (46.8150767861, 24.7778882282), (46.5221835672, 24.070781447))
            Line((46.5221835672, 24.070781447), (46.5221835672, 25.070781447))
            Line((46.5221835672, 25.070781447), (47.5221835672, 25.070781447))
        make_face()
    extrude(amount=F11_T113_DEPTH)

    split(bisect_by=Plane(origin=(-6.2389082164, 0, -6.2389082164), x_dir=(0, 1, 0), z_dir=(-0.7071067812, 0, -0.7071067812)), keep=Keep.TOP)


with BuildPart() as f11_tool115:
    # F11_s116 → F11_t117 (new body)
    with BuildSketch(Plane(origin=(-8.0066751693, 0, 8.0066751693), x_dir=(0, 1, 0), z_dir=(0.7071067812, 0, -0.7071067812))):
        with BuildLine():
            ThreePointArc((25.070781447, -9.823148614), (24.7778882282, -9.1160418328), (24.070781447, -8.823148614))
            Line((24.070781447, -8.823148614), (25.070781447, -8.823148614))
            Line((25.070781447, -8.823148614), (25.070781447, -9.823148614))
        make_face()
    extrude(amount=F11_T117_DEPTH)

    split(bisect_by=Plane.YZ.offset(46.5221835672), keep=Keep.TOP)


with BuildPart() as f11_tool111_1:
    add(f11_tool111.part)

    # F11_t119: intersect F11_tool115
    add(f11_tool115.part, mode=Mode.INTERSECT)


with BuildPart() as f1_14:
    add(f1_13.part)

    # F11_t109: cut F11_tool111
    add(f11_tool111_1.part, mode=Mode.SUBTRACT)


with BuildPart() as f11_tool122:
    # F11_s123 → F11_t124 (new body)
    with BuildSketch(Plane.XY.offset(-62.4142135624)):
        with BuildLine():
            ThreePointArc((47.5221835672, 25.070781447), (46.8150767861, 24.7778882282), (46.5221835672, 24.070781447))
            Line((46.5221835672, 24.070781447), (46.5221835672, 25.070781447))
            Line((46.5221835672, 25.070781447), (47.5221835672, 25.070781447))
        make_face()
    extrude(amount=-F11_T124_DEPTH)

    split(bisect_by=Plane(origin=(-11.7389082164, 0, -11.7389082164), x_dir=(0, 1, 0), z_dir=(-0.7071067812, 0, -0.7071067812)), keep=Keep.TOP)


with BuildPart() as f11_tool126:
    # F11_s127 → F11_t128 (new body)
    with BuildSketch(Plane(origin=(60.0288587366, 0, -60.0288587366), x_dir=(0, 1, 0), z_dir=(-0.7071067812, 0, 0.7071067812))):
        with BuildLine():
            ThreePointArc((25.070781447, 17.6013232071), (24.7778882282, 16.8942164259), (24.070781447, 16.6013232071))
            Line((24.070781447, 16.6013232071), (25.070781447, 16.6013232071))
            Line((25.070781447, 16.6013232071), (25.070781447, 17.6013232071))
        make_face()
    extrude(amount=F11_T128_DEPTH)

    split(bisect_by=Plane.YZ.offset(46.5221835672), keep=Keep.TOP)


with BuildPart() as f11_tool122_1:
    add(f11_tool122.part)

    # F11_t130: intersect F11_tool126
    add(f11_tool126.part, mode=Mode.INTERSECT)


with BuildPart() as f1_15:
    add(f1_14.part)

    # F11_t120: cut F11_tool122
    add(f11_tool122_1.part, mode=Mode.SUBTRACT)


with BuildPart() as f11_tool133:
    # F11_s134 → F11_t135 (new body)
    with BuildSketch(Plane(origin=(60.0288587366, 0, -60.0288587366), x_dir=(0, 1, 0), z_dir=(-0.7071067812, 0, 0.7071067812))):
        with BuildLine():
            ThreePointArc((25.070781447, 17.6013232071), (24.7778882282, 16.8942164259), (24.070781447, 16.6013232071))
            Line((24.070781447, 16.6013232071), (25.070781447, 16.6013232071))
            Line((25.070781447, 16.6013232071), (25.070781447, 17.6013232071))
        make_face()
    extrude(amount=F11_T135_DEPTH)

    split(bisect_by=Plane.XY, keep=Keep.TOP)


with BuildPart() as f11_tool137:
    # F11_s138 → F11_t139 (new body)
    with BuildSketch(Plane.YZ.offset(-25.9778164328)):
        with BuildLine():
            ThreePointArc((25.070781447, 1), (24.7778882282, 0.2928932188), (24.070781447, 0))
            Line((24.070781447, 0), (25.070781447, 0))
            Line((25.070781447, 0), (25.070781447, 1))
        make_face()
    extrude(amount=F11_T139_DEPTH)

    split(bisect_by=Plane(origin=(-11.7389082164, 0, -11.7389082164), x_dir=(0, 1, 0), z_dir=(-0.7071067812, 0, -0.7071067812)), keep=Keep.TOP)


with BuildPart() as f11_tool133_1:
    add(f11_tool133.part)

    # F11_t141: intersect F11_tool137
    add(f11_tool137.part, mode=Mode.INTERSECT)


with BuildPart() as f1_16:
    add(f1_15.part)

    # F11_t131: cut F11_tool133
    add(f11_tool133_1.part, mode=Mode.SUBTRACT)


solid = f1_16.part
